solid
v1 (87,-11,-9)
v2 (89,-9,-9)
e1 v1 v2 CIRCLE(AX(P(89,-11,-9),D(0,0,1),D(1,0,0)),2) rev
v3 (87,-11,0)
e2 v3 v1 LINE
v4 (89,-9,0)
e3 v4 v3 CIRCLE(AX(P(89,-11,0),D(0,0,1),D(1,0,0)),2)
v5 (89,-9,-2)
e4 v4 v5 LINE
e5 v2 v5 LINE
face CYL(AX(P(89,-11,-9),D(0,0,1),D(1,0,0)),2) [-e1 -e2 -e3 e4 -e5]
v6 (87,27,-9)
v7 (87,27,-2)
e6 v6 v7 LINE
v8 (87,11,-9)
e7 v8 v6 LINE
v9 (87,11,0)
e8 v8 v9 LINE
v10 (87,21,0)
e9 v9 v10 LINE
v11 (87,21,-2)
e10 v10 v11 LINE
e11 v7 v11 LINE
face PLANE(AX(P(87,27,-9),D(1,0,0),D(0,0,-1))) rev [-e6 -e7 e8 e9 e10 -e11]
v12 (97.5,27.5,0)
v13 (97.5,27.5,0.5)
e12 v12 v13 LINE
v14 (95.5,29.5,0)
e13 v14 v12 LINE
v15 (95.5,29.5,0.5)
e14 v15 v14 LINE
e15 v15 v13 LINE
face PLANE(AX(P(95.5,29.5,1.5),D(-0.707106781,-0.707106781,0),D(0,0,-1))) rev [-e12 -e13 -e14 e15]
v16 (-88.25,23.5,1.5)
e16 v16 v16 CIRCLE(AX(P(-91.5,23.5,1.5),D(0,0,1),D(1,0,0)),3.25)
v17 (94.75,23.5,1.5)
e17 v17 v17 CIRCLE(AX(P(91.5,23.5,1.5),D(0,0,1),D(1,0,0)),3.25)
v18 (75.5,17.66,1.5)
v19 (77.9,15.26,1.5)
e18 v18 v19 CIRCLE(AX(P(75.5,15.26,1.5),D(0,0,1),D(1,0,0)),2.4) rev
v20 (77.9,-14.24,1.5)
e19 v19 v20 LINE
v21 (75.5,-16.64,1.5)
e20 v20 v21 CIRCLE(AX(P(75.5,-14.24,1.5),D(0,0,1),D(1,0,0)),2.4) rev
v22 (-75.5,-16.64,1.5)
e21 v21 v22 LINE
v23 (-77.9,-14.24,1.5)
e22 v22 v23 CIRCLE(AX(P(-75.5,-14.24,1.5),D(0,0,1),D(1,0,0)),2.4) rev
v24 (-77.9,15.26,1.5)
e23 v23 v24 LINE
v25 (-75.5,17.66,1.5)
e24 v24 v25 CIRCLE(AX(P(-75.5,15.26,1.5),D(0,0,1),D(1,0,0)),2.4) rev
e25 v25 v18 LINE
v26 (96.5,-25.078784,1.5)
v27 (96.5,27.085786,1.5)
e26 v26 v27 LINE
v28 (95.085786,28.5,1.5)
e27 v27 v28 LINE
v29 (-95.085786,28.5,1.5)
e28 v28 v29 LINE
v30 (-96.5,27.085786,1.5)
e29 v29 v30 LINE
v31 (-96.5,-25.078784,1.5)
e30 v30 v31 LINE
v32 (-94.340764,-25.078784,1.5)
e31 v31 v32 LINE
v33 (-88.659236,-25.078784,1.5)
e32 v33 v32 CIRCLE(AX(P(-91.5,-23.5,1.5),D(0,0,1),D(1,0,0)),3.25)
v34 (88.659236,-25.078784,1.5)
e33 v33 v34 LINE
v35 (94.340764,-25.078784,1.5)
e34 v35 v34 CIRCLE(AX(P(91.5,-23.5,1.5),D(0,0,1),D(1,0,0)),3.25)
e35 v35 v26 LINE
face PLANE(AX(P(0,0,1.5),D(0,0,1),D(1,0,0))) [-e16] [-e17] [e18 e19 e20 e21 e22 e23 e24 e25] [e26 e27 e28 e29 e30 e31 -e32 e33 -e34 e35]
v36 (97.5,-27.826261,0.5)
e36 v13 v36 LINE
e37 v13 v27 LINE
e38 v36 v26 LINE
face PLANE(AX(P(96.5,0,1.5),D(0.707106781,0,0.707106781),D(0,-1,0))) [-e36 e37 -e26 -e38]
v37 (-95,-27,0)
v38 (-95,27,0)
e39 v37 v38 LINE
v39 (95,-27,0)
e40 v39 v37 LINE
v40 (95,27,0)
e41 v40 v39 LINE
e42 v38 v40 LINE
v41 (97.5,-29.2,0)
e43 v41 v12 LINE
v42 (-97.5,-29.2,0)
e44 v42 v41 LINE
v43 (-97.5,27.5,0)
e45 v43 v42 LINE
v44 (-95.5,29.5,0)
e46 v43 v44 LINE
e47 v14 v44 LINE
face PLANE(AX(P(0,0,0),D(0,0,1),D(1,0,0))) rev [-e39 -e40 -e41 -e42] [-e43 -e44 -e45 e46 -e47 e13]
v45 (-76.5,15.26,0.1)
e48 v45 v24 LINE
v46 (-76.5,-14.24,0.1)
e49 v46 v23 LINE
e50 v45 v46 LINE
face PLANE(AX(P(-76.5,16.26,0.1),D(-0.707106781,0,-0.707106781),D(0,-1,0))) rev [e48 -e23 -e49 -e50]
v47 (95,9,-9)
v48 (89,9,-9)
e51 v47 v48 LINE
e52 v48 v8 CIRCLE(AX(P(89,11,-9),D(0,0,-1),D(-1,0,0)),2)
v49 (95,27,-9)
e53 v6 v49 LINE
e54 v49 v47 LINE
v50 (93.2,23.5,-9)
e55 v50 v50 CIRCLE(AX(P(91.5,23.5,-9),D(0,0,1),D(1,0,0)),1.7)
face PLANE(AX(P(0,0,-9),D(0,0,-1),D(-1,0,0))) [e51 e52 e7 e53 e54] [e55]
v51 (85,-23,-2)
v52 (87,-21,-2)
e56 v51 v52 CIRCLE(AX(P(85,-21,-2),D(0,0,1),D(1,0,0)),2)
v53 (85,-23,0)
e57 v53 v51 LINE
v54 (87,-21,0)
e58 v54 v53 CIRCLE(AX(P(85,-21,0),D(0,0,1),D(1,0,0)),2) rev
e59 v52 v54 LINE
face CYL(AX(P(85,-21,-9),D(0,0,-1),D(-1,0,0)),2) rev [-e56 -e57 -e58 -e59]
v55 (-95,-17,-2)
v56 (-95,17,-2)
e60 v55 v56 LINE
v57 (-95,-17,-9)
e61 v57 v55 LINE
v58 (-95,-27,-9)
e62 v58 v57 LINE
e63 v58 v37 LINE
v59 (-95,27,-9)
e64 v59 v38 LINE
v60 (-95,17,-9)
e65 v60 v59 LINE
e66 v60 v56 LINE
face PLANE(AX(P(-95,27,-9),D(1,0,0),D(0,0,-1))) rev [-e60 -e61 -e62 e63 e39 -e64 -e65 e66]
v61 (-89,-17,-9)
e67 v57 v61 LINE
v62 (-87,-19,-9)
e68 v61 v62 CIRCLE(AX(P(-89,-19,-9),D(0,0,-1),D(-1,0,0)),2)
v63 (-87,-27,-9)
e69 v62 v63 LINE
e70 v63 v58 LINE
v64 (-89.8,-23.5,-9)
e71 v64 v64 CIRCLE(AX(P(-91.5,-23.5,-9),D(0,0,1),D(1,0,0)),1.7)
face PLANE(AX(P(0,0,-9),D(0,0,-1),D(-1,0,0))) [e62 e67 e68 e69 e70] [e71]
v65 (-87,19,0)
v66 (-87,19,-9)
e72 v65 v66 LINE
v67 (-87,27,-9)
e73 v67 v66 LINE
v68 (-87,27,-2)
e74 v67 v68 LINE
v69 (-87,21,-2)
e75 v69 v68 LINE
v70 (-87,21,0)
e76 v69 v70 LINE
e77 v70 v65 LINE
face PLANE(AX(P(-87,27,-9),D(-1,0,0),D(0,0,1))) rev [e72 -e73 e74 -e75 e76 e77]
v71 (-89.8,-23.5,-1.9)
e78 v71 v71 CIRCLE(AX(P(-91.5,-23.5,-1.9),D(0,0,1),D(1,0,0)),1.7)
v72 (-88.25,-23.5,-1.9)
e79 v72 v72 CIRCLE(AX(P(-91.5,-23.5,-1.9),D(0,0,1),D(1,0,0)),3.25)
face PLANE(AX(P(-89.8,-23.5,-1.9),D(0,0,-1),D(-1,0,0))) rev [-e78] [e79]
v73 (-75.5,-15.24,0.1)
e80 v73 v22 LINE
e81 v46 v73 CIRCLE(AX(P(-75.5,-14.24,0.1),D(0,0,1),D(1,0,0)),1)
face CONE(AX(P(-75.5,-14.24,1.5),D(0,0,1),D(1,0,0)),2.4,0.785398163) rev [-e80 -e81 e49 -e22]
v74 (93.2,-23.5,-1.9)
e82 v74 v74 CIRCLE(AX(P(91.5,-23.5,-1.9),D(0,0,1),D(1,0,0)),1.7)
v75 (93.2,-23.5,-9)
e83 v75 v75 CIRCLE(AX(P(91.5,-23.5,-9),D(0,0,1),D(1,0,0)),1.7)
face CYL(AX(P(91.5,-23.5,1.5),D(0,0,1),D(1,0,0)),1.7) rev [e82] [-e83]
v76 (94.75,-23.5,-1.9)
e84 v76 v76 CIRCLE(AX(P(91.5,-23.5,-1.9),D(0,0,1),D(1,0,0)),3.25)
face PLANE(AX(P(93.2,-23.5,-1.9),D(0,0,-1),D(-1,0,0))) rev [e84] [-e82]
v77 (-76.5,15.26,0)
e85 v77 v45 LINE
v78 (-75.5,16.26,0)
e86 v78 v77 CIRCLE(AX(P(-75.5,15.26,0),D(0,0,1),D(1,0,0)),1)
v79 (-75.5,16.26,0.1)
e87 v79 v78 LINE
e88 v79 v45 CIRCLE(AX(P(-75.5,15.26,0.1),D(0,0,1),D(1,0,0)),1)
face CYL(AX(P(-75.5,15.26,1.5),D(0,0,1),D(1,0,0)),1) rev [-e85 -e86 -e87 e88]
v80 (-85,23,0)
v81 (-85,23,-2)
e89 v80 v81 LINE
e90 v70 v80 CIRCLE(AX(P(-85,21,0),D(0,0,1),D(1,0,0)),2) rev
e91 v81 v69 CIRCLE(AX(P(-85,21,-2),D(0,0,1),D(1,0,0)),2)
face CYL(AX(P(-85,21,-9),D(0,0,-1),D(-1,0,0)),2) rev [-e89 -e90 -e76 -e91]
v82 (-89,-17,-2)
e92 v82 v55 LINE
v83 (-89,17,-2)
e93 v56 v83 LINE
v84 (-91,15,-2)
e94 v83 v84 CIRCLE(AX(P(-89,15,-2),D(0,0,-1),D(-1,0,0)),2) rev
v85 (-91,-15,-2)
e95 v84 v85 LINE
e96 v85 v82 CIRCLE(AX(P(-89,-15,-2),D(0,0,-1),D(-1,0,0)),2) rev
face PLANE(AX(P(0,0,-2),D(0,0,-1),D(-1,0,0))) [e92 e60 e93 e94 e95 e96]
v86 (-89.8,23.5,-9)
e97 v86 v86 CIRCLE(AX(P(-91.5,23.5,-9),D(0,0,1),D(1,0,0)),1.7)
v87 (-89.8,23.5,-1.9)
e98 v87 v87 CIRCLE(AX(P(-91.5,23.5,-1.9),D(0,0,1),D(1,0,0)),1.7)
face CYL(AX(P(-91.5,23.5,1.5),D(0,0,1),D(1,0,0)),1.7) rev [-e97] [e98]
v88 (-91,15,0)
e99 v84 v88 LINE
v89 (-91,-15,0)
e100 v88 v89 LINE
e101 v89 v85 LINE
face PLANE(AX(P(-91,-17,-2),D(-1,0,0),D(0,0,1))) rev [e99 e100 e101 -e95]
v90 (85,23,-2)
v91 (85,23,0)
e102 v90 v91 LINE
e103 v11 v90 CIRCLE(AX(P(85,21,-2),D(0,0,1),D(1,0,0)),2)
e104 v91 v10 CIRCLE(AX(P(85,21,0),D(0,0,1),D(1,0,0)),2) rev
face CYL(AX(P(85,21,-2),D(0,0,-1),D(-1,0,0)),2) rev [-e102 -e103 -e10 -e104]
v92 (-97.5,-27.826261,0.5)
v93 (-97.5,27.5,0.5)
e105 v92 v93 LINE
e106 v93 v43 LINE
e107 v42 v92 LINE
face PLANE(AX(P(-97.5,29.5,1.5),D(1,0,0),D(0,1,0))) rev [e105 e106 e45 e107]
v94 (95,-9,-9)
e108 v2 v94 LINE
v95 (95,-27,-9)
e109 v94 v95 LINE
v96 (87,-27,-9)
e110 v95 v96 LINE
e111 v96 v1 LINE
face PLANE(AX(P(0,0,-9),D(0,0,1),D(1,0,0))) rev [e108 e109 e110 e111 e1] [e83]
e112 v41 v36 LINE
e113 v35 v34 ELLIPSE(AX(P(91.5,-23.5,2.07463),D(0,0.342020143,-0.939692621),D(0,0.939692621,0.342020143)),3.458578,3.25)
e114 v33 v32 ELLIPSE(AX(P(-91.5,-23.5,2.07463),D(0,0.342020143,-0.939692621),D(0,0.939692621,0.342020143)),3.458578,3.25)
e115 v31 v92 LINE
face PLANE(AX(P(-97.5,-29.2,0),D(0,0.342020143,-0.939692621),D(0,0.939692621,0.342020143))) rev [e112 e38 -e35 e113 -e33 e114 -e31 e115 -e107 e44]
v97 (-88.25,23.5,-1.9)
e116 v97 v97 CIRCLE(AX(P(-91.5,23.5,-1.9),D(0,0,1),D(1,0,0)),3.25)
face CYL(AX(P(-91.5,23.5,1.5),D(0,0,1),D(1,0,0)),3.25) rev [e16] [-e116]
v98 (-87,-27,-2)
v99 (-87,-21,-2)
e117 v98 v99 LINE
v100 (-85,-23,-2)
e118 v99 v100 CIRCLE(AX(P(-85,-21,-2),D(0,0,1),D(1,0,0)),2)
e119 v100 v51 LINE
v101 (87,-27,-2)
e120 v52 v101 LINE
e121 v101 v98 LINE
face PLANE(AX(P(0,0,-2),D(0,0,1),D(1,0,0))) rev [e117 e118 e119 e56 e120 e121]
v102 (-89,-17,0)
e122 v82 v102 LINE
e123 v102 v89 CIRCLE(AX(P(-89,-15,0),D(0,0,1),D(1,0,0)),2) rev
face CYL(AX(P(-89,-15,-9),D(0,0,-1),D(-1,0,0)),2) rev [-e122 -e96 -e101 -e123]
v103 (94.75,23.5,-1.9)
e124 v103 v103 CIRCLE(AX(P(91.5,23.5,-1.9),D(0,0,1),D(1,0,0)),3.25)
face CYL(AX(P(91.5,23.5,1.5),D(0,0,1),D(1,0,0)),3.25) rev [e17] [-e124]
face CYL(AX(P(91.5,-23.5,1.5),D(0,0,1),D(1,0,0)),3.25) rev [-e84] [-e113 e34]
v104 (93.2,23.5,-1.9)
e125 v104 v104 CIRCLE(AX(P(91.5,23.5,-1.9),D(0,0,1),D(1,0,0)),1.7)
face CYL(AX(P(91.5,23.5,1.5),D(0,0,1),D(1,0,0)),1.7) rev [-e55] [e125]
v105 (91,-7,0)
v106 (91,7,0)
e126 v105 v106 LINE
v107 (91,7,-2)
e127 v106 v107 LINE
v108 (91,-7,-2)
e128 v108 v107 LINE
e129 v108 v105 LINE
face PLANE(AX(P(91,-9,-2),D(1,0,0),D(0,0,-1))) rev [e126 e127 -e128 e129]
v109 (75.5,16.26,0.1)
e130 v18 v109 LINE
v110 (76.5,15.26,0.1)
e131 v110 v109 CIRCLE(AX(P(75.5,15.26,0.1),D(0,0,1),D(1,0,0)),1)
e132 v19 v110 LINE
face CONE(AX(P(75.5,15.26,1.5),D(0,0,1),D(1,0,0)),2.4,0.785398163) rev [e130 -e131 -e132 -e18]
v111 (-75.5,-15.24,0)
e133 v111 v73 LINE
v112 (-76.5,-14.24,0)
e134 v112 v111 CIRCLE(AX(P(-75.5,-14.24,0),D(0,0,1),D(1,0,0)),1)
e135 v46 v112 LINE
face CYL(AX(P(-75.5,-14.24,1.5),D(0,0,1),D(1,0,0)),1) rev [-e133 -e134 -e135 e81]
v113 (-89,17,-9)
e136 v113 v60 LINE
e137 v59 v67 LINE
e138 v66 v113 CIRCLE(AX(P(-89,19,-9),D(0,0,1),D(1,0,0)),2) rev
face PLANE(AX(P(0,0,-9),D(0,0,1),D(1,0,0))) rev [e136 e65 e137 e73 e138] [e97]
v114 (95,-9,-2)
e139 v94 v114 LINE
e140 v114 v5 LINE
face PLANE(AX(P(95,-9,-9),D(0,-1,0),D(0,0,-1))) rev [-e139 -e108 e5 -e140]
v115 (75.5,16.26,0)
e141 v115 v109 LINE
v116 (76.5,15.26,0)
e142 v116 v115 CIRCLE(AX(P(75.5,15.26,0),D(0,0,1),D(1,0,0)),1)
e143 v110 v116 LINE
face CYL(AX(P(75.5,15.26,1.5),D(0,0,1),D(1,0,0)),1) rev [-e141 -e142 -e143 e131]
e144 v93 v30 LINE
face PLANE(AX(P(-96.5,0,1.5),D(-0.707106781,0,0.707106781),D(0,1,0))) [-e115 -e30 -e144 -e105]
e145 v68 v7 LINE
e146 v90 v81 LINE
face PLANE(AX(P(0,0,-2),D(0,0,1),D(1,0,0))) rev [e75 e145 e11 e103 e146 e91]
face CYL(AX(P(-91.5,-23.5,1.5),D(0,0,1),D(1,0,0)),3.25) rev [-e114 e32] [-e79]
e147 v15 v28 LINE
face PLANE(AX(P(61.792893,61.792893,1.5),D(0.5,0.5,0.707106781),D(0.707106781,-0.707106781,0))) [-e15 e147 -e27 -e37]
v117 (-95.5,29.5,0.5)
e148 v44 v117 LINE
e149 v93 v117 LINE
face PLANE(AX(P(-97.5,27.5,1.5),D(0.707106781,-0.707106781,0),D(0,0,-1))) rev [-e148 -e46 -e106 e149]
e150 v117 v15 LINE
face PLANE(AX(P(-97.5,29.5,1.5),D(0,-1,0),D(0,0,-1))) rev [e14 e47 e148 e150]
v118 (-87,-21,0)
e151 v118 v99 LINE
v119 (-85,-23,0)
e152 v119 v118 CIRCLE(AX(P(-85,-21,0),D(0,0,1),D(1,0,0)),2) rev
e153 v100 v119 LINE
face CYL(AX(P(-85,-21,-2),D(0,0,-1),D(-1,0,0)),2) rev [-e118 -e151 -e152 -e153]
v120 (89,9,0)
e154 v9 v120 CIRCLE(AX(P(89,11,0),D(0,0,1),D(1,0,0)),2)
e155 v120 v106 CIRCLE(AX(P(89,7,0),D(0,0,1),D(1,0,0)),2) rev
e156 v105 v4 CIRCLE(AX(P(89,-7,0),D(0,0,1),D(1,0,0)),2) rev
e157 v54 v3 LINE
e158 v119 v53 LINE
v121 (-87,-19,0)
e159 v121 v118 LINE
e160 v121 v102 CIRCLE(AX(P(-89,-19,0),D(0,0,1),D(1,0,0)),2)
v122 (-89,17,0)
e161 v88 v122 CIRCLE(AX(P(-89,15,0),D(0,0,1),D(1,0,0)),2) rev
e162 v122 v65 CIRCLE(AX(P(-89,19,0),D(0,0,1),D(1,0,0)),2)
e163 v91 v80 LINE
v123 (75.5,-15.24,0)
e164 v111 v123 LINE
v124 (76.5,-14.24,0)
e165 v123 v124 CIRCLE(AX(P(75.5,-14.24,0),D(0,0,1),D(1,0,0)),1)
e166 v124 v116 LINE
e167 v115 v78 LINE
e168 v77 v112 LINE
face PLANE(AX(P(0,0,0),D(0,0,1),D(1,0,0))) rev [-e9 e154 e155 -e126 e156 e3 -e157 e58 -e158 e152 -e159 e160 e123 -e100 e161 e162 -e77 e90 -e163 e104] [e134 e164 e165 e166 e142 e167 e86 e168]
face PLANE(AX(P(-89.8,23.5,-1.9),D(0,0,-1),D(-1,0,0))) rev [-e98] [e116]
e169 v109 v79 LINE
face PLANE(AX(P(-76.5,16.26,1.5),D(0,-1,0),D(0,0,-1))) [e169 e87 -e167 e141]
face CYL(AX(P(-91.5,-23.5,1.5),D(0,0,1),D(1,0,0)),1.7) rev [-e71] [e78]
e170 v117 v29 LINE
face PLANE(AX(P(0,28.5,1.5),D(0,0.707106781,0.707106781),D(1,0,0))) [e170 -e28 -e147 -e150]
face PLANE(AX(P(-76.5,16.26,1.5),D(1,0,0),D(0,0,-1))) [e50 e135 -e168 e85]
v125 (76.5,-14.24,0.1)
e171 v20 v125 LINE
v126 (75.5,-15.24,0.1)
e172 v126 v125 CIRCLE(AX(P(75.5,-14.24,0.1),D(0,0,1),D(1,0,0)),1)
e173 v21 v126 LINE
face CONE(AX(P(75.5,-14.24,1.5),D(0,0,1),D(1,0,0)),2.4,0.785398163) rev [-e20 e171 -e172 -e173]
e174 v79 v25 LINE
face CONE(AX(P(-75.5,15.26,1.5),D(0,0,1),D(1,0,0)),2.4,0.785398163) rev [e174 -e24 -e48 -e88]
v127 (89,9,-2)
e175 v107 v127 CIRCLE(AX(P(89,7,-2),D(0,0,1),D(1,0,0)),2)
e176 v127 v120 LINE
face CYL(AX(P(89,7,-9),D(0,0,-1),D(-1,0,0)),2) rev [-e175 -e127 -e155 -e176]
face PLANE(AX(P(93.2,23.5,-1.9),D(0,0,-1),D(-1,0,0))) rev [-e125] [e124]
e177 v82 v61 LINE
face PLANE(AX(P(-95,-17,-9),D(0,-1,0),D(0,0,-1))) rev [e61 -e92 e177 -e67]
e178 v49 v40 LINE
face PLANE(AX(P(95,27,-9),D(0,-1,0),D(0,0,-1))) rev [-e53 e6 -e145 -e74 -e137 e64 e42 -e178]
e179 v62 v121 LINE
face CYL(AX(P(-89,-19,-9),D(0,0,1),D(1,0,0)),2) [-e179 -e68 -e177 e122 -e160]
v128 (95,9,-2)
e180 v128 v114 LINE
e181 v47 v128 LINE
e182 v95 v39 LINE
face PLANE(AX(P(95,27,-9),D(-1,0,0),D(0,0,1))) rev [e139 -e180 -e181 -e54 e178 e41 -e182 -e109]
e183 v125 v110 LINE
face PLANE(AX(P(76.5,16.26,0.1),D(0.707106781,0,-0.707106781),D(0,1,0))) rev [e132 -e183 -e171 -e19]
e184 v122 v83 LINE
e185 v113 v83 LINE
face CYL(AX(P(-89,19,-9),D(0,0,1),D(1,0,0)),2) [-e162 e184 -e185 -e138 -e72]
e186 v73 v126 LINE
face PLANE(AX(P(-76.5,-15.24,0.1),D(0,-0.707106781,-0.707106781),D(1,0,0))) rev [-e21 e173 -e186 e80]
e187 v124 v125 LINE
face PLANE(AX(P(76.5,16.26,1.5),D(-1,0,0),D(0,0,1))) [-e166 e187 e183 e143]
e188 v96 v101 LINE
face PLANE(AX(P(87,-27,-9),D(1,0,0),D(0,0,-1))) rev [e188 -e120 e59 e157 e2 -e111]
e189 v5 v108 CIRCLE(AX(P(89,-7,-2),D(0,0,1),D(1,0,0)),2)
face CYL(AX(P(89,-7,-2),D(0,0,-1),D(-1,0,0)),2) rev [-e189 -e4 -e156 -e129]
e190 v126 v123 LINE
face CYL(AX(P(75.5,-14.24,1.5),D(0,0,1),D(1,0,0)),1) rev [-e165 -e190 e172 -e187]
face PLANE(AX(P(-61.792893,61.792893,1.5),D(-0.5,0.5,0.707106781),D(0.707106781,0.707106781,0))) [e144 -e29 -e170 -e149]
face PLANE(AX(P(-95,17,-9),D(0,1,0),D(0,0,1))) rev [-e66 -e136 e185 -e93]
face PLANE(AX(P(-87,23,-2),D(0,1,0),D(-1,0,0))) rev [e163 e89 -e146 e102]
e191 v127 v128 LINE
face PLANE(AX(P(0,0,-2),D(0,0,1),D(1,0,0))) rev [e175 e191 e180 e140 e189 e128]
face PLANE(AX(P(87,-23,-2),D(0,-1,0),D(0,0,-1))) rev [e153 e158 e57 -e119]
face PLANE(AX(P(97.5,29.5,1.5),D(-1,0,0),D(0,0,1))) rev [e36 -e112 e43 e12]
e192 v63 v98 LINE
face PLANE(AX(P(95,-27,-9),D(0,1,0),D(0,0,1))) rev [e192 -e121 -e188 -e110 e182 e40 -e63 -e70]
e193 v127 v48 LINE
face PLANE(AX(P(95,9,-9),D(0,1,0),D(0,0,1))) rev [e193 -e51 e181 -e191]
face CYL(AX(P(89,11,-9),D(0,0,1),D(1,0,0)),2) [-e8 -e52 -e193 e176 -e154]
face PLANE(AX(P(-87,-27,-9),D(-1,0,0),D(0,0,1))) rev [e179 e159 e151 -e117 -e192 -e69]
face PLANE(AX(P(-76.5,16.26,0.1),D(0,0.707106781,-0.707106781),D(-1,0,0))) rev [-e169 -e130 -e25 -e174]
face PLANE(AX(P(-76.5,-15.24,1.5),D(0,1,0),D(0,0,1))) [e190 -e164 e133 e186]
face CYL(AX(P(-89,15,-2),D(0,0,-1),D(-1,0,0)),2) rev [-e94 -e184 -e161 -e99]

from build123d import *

# Parameters (mm, degrees)
CROQUIS1_W                                           = 195
CROQUIS1_H                                           = 58.7
CROQUIS1_W_2                                         = 153
CROQUIS1_H_2                                         = 31.5
SALIENTE_EXTRUIR1_DEPTH                              = 1.5
REDONDEO1_R                                          = 1
CHAFL_N1_SIZE                                        = 1.4
CORTAR_EXTRUIR1_DEPTH                                = 198.22449138
CROQUIS3_W                                           = 8
CROQUIS3_H                                           = 18
CROQUIS3_H_2                                         = 10
SALIENTE_EXTRUIR2_DEPTH                              = 9
CROQUIS4_W                                           = 174
CROQUIS4_H                                           = 4
CROQUIS4_W_2                                         = 4
CROQUIS4_H_2                                         = 18
CROQUIS4_H_3                                         = 34
SALIENTE_EXTRUIR3_DEPTH                              = 2
REDONDEO2_R                                          = 2
REFRENTADO_PARA_TORNILLO_CON_CABEZA_HUEC_D           = 3.4
REFRENTADO_PARA_TORNILLO_CON_CABEZA_HUEC_CBORE_D     = 6.5
REFRENTADO_PARA_TORNILLO_CON_CABEZA_HUEC_CBORE_DEPTH = 3.4
CHAFL_N2_SIZE                                        = 2
CHAFL_N3_SIZE                                        = 1


with BuildPart() as part:
    # Croquis1 → Saliente-Extruir1 (new body)
    with BuildSketch(Plane.XY):
        with Locations((0, 0.15)):
            Rectangle(CROQUIS1_W, CROQUIS1_H)
        with Locations((0, 0.51)):
            Rectangle(CROQUIS1_W_2, CROQUIS1_H_2, mode=Mode.SUBTRACT)
    extrude(amount=SALIENTE_EXTRUIR1_DEPTH)

    # Redondeo1
    redondeo1_edges = [part.edges().sort_by_distance(p)[0] for p in [
        (-76.5, 16.26, 0.75),
        (-76.5, -15.24, 0.75),
        (76.5, -15.24, 0.75),
        (76.5, 16.26, 0.75),
    ]]
    fillet(redondeo1_edges, radius=REDONDEO1_R)

    # Chaflán1
    chafl_n1_edges = [part.edges().sort_by_distance(p)[0] for p in [
        (-76.5, 0.51, 1.5),
        (0, -15.24, 1.5),
        (76.5, 0.51, 1.5),
        (0, 16.26, 1.5),
        (-76.207106781, -14.947106781, 1.5),
        (76.207106781, -14.947106781, 1.5),
        (76.207106781, 15.967106781, 1.5),
        (-76.207106781, 15.967106781, 1.5),
    ]]
    chamfer(chafl_n1_edges, length=CHAFL_N1_SIZE)

    # Croquis2 → Cortar-Extruir1 (cut, through all)
    with BuildSketch(Plane(origin=(97.5, 0, 0), x_dir=(0, 0, -1), z_dir=(1, 0, 0))):
        Polygon((0, -29.2), (-1.5, -25.078783871), (-1.5, -29.2), align=None)
    extrude(amount=-CORTAR_EXTRUIR1_DEPTH, mode=Mode.SUBTRACT)

    # Croquis3 → Saliente-Extruir2 (add)
    with BuildSketch(Plane(origin=(0, 0, 0), x_dir=(-1, 0, 0), z_dir=(0, 0, -1))):
        with Locations((-91, 18)):
            Rectangle(CROQUIS3_W, CROQUIS3_H)
        with Locations((-91, -18)):
            Rectangle(CROQUIS3_W, CROQUIS3_H)
        with Locations((91, 22)):
            Rectangle(CROQUIS3_W, CROQUIS3_H_2)
        with Locations((91, -22)):
            Rectangle(CROQUIS3_W, CROQUIS3_H_2)
    extrude(amount=SALIENTE_EXTRUIR2_DEPTH)

    # Croquis4 → Saliente-Extruir3 (add)
    with BuildSketch(Plane(origin=(0, 0, 0), x_dir=(-1, 0, 0), z_dir=(0, 0, -1))):
        with Locations((0, 25)):
            Rectangle(CROQUIS4_W, CROQUIS4_H)
        with Locations((0, -25)):
            Rectangle(CROQUIS4_W, CROQUIS4_H)
        with Locations((-93, 0)):
            Rectangle(CROQUIS4_W_2, CROQUIS4_H_2)
        with Locations((93, 0)):
            Rectangle(CROQUIS4_W_2, CROQUIS4_H_3)
    extrude(amount=SALIENTE_EXTRUIR3_DEPTH)

    # Redondeo2
    redondeo2_edges = [part.edges().sort_by_distance(p)[0] for p in [
        (-87, 17, -4.5),
        (-87, -17, -4.5),
        (87, -9, -4.5),
        (87, 9, -4.5),
        (91, -9, -1),
        (87, -23, -1),
        (-87, -23, -1),
        (-91, -17, -1),
        (-91, 17, -1),
        (-87, 23, -1),
        (87, 23, -1),
        (91, 9, -1),
    ]]
    fillet(redondeo2_edges, radius=REDONDEO2_R - 0.0001)  # a hair under: the kernel refuses the full size

    # Refrentado para tornillo con cabeza hueca de M31 (through all)
    with Locations(Plane.XY.offset(1.5)):
        with Locations((-91.5, 23.5), (-91.5, -23.5), (91.5, -23.5), (91.5, 23.5)):
            CounterBoreHole(REFRENTADO_PARA_TORNILLO_CON_CABEZA_HUEC_D / 2, REFRENTADO_PARA_TORNILLO_CON_CABEZA_HUEC_CBORE_D / 2, REFRENTADO_PARA_TORNILLO_CON_CABEZA_HUEC_CBORE_DEPTH)

    # Chaflán2
    chafl_n2_edges = [part.edges().sort_by_distance(p)[0] for p in [
        (-97.5, 29.5, 0.75),
        (97.5, 29.5, 0.75),
    ]]
    chamfer(chafl_n2_edges, length=CHAFL_N2_SIZE)

    # Chaflán3
    chafl_n3_edges = [part.edges().sort_by_distance(p)[0] for p in [
        (0, 29.5, 1.5),
        (-97.5, 1.210608065, 1.5),
        (-96.5, 28.5, 1.5),
        (96.5, 28.5, 1.5),
        (97.5, 1.210608065, 1.5),
    ]]
    chamfer(chafl_n3_edges, length=CHAFL_N3_SIZE)


solid = part.part
